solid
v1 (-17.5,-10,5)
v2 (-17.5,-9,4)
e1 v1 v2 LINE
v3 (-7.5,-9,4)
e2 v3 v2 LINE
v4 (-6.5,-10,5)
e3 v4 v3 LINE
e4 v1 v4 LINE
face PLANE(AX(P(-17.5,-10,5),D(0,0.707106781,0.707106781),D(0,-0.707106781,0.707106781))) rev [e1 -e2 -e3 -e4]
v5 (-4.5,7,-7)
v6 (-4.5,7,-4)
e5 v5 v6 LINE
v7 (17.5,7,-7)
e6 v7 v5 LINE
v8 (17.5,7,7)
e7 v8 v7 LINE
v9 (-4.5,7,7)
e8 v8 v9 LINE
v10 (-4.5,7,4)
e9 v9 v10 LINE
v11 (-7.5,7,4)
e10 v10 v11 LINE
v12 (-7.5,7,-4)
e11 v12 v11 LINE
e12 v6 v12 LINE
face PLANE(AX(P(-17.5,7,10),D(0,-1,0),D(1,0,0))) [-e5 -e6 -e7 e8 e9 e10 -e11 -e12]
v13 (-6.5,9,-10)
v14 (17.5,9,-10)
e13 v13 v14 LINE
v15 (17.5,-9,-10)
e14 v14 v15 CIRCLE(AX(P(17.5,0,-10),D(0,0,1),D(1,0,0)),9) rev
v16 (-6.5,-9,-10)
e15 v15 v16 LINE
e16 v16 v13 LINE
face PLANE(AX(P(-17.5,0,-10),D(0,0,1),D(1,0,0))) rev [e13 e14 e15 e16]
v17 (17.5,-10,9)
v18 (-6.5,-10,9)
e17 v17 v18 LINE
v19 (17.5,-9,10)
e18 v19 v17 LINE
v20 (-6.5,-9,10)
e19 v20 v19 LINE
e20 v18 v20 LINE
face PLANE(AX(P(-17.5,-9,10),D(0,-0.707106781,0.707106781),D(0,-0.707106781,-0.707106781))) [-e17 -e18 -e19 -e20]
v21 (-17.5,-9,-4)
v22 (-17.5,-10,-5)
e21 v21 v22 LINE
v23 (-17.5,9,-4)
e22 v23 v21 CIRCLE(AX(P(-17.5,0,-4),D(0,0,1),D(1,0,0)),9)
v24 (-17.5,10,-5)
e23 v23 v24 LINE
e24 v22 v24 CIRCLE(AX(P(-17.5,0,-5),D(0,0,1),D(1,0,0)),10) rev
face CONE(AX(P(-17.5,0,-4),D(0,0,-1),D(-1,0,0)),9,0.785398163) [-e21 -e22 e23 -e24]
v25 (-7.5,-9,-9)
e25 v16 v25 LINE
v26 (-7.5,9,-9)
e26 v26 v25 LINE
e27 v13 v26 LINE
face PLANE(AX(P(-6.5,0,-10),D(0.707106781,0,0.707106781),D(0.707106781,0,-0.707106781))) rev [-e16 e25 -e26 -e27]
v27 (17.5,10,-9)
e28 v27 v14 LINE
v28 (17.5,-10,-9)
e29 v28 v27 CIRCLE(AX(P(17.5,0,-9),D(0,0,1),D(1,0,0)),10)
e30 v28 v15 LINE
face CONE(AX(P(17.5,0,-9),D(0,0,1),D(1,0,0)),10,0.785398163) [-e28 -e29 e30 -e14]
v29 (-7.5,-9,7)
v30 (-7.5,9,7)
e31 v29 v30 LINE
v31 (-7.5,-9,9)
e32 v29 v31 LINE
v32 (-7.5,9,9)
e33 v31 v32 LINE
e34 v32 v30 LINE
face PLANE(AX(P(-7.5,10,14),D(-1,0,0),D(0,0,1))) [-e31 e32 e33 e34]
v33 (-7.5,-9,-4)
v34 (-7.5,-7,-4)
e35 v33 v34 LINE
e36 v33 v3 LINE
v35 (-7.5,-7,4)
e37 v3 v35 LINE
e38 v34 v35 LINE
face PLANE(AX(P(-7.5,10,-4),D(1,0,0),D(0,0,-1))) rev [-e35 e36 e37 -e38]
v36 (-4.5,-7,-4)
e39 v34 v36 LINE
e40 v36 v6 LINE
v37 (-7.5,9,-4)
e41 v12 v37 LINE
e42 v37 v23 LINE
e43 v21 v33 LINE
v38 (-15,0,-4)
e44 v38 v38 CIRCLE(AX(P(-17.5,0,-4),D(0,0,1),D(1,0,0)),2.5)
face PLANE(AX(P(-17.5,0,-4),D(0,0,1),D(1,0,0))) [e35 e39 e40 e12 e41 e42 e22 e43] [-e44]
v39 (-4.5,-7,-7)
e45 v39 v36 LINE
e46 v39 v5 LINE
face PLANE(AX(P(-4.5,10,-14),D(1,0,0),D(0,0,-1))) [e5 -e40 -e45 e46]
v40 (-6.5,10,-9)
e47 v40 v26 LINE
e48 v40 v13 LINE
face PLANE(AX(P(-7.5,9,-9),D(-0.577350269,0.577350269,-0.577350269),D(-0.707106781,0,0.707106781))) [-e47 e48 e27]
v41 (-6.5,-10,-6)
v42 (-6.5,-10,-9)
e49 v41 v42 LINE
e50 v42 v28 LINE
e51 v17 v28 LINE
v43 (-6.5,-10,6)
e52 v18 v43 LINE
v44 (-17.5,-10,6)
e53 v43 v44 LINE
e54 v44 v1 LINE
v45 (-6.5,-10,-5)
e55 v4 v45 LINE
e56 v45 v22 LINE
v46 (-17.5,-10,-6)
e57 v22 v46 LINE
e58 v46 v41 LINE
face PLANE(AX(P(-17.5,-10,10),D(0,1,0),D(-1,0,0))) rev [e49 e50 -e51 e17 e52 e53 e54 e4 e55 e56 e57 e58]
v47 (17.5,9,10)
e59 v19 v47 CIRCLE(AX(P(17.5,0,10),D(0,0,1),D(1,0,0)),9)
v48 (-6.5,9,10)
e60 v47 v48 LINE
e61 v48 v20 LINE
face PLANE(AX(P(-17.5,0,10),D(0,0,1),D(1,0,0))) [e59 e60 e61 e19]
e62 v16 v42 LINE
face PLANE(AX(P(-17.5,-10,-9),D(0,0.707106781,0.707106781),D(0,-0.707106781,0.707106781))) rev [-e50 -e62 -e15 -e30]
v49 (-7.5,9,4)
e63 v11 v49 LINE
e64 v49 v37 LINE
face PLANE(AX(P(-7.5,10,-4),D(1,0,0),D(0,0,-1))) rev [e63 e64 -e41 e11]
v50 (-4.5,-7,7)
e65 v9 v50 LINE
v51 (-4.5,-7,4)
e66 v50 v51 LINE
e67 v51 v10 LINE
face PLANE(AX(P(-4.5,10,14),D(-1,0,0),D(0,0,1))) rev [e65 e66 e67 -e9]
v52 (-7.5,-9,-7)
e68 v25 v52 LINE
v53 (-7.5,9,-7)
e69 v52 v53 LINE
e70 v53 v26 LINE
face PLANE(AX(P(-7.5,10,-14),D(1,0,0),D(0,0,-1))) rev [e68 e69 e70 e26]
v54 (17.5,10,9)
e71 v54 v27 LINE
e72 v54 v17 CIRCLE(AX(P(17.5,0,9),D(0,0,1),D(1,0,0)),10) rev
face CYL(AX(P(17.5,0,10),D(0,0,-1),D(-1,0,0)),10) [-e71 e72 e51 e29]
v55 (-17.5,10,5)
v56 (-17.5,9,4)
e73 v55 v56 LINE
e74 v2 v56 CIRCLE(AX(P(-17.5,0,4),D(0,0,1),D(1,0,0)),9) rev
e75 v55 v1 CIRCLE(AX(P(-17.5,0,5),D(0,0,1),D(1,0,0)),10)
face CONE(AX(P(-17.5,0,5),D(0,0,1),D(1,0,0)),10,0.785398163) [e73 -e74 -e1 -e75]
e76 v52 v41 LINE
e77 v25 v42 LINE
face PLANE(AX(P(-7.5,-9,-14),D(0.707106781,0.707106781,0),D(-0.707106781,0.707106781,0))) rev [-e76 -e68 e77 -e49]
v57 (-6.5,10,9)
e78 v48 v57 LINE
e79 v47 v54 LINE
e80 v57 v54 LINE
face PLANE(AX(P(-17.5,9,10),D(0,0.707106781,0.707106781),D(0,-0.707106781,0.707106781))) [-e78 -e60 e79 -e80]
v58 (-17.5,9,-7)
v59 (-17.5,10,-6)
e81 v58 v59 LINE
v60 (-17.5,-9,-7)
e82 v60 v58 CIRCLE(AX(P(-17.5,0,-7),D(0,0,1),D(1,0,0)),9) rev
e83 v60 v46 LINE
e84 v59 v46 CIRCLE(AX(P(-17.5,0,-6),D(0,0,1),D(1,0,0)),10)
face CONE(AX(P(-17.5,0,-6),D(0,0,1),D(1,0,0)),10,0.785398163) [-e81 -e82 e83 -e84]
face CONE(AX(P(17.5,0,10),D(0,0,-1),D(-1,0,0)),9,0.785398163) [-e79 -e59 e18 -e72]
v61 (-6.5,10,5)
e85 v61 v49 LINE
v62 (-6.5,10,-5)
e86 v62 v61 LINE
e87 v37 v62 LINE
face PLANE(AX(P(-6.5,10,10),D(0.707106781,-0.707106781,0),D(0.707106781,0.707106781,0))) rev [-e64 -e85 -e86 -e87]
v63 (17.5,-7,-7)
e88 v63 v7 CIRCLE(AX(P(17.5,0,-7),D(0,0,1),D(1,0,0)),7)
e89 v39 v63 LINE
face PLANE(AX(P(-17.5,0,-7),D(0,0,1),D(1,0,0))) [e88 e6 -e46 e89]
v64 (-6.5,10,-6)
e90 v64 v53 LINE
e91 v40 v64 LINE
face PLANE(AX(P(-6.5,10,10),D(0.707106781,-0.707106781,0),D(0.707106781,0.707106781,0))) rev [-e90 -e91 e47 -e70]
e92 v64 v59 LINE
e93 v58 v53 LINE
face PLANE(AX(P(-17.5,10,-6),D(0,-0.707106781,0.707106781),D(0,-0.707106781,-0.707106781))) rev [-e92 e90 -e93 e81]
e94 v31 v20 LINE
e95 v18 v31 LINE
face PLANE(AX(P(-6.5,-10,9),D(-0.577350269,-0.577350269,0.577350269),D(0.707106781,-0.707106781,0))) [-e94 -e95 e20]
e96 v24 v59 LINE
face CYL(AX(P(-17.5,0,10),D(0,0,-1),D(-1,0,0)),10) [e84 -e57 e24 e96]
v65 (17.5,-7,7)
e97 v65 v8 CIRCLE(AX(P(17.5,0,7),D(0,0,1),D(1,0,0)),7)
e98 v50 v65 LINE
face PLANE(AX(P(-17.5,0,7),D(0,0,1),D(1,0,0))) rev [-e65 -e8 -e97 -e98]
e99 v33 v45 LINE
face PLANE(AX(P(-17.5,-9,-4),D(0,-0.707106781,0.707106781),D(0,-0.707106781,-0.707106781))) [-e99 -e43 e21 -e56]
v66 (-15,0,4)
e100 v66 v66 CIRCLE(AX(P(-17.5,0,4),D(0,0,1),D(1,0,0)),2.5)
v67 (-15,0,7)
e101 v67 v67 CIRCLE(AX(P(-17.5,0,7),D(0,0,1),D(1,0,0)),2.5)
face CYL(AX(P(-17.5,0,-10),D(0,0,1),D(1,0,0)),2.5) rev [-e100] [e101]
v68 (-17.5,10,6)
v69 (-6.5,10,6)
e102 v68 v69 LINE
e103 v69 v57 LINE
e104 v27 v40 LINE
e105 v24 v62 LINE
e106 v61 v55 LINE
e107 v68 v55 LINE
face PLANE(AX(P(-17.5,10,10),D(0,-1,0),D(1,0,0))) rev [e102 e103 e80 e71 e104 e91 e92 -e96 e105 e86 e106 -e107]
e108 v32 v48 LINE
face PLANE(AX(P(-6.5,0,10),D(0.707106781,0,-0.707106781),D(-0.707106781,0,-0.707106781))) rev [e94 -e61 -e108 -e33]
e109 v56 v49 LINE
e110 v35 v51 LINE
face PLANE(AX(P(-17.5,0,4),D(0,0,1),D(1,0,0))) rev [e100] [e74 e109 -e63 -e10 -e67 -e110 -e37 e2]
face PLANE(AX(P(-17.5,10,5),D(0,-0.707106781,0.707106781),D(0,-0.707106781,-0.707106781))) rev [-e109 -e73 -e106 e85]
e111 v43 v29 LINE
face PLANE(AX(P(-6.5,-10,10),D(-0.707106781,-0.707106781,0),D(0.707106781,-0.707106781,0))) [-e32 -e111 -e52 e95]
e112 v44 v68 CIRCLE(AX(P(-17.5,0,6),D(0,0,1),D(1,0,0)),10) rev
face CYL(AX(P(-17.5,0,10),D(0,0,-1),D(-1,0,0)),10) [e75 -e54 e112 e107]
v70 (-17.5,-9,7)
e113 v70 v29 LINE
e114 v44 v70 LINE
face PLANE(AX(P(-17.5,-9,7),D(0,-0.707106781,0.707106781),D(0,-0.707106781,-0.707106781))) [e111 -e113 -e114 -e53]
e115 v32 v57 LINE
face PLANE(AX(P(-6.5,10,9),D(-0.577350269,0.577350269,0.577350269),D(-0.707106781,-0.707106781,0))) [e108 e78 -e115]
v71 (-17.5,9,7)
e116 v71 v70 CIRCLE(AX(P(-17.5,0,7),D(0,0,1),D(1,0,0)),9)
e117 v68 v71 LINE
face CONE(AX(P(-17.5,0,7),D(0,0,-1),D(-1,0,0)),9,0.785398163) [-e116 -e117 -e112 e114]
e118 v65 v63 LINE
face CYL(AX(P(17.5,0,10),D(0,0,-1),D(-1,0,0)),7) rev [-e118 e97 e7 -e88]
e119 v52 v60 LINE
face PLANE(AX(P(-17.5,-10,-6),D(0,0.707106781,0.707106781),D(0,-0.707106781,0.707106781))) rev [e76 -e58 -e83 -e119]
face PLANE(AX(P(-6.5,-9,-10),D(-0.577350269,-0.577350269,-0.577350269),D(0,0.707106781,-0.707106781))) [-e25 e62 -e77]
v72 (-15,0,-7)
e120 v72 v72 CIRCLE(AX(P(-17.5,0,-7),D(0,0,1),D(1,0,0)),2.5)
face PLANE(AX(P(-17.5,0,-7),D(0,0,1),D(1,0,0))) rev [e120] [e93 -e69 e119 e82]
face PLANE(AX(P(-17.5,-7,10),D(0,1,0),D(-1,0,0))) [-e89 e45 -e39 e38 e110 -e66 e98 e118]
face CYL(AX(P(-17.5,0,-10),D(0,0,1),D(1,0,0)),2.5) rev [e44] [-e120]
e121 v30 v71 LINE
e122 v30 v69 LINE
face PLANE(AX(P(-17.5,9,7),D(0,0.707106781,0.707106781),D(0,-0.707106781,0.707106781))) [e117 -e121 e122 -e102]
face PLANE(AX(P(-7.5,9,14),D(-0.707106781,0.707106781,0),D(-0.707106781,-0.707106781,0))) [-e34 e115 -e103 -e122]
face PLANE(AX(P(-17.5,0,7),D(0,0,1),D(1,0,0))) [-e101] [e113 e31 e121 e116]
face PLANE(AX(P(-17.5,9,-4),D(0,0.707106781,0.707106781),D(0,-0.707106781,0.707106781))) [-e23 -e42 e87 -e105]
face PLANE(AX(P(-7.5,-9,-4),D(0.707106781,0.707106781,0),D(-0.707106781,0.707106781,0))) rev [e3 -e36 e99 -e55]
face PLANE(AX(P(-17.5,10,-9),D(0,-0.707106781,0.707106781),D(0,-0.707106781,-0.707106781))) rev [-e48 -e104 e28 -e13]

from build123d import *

# Parameters (mm, degrees)
BOSS_EXTRUDE1_DEPTH = 10
CUT_EXTRUDE1_DEPTH  = 4
CUT_EXTRUDE2_START  = -7
CUT_EXTRUDE2_DEPTH  = 7
CUT_EXTRUDE3_START  = 14
CUT_EXTRUDE3_DEPTH  = 7
SKETCH3_R           = 2.5
CUT_EXTRUDE4_DEPTH  = 10
SHELL1_START        = -7
SHELL1_DEPTH        = 14
SHELL1_START_2      = -4
SHELL1_2_OUTLINE_W  = 3
SHELL1_2_OUTLINE_H  = 14
SHELL1_2_DEPTH      = 8
CHAMFER1_SIZE       = 1


# Read off the part's stored shape, not the designer's step: Shell1
with BuildPart() as part:
    # Sketch1 → Boss-Extrude1 (new, symmetric)
    with BuildSketch(Plane.XY):
        with BuildLine():
            Line((-17.5, 10), (17.5, 10))
            ThreePointArc((17.5, 10), (27.5, 0), (17.5, -10))
            Line((17.5, -10), (-17.5, -10))
            ThreePointArc((-17.5, -10), (-27.5, 0), (-17.5, 10))
        make_face()
    extrude(amount=BOSS_EXTRUDE1_DEPTH, both=True)

    # Sketch2 → Cut-Extrude1 (cut, symmetric)
    with BuildSketch(Plane.XY):
        with BuildLine():
            Line((-17.5, 10), (-7.5, 10))
            Line((-7.5, 10), (-7.5, -10))
            Line((-7.5, -10), (-17.5, -10))
            ThreePointArc((-17.5, -10), (-27.5, 0), (-17.5, 10))
        make_face()
    extrude(amount=CUT_EXTRUDE1_DEPTH, both=True, mode=Mode.SUBTRACT)

    # Sketch2<2> → Cut-Extrude2 (cut)
    with BuildSketch(Plane.XY.offset(CUT_EXTRUDE2_START)):
        with BuildLine():
            Line((-17.5, 10), (-7.5, 10))
            Line((-7.5, 10), (-7.5, -10))
            Line((-7.5, -10), (-17.5, -10))
            ThreePointArc((-17.5, -10), (-27.5, 0), (-17.5, 10))
        make_face()
    extrude(amount=-CUT_EXTRUDE2_DEPTH, mode=Mode.SUBTRACT)

    # Sketch2<3> → Cut-Extrude3 (cut)
    with BuildSketch(Plane.XY.offset(CUT_EXTRUDE3_START)):
        with BuildLine():
            Line((-17.5, 10), (-7.5, 10))
            Line((-7.5, 10), (-7.5, -10))
            Line((-7.5, -10), (-17.5, -10))
            ThreePointArc((-17.5, -10), (-27.5, 0), (-17.5, 10))
        make_face()
    extrude(amount=-CUT_EXTRUDE3_DEPTH, mode=Mode.SUBTRACT)

    # Sketch3 → Cut-Extrude4 (cut, symmetric)
    with BuildSketch(Plane.XY):
        with Locations((-17.5, 0)):
            Circle(SKETCH3_R)
    extrude(amount=CUT_EXTRUDE4_DEPTH, both=True, mode=Mode.SUBTRACT)

    # Shell1 outline → Shell1 (cut)
    with BuildSketch(Plane.XY.offset(SHELL1_START)):
        with BuildLine():
            Line((-4.5, -7), (17.5, -7))
            ThreePointArc((17.5, -7), (24.5, 0), (17.5, 7))
            Line((17.5, 7), (-4.5, 7))
            Line((-4.5, 7), (-4.5, -7))
        make_face()
    extrude(amount=SHELL1_DEPTH, mode=Mode.SUBTRACT)

    # Shell1 2 outline → Shell1 2 (cut)
    with BuildSketch(Plane.XY.offset(SHELL1_START_2)):
        with Locations((-6, 0)):
            Rectangle(SHELL1_2_OUTLINE_W, SHELL1_2_OUTLINE_H)
    extrude(amount=SHELL1_2_DEPTH, mode=Mode.SUBTRACT)

    # Chamfer1
    chamfer1_edges = [part.edges().sort_by_distance(p)[0] for p in [
        (27.5, 0, 10),
        (5, 10, 10),
        (-27.5, 0, -4),
        (-12.5, 10, -4),
        (-7.5, 10, 0),
        (-12.5, -10, -4),
        (-7.5, -10, 0),
        (-27.5, 0, 4),
        (-12.5, -10, 4),
        (-12.5, 10, 4),
        (5, -10, -10),
        (-7.5, 0, -10),
        (-7.5, 10, -8.5),
        (-7.5, -10, -8.5),
        (-27.5, 0, -7),
        (-12.5, -10, -7),
        (-12.5, 10, -7),
        (5, 10, -10),
        (5, -10, 10),
        (-7.5, 0, 10),
        (27.5, 0, -10),
        (-27.5, 0, 7),
        (-12.5, -10, 7),
        (-7.5, -10, 8.5),
        (-7.5, 10, 8.5),
        (-12.5, 10, 7),
    ]]
    chamfer(chamfer1_edges, length=CHAMFER1_SIZE)


solid = part.part
